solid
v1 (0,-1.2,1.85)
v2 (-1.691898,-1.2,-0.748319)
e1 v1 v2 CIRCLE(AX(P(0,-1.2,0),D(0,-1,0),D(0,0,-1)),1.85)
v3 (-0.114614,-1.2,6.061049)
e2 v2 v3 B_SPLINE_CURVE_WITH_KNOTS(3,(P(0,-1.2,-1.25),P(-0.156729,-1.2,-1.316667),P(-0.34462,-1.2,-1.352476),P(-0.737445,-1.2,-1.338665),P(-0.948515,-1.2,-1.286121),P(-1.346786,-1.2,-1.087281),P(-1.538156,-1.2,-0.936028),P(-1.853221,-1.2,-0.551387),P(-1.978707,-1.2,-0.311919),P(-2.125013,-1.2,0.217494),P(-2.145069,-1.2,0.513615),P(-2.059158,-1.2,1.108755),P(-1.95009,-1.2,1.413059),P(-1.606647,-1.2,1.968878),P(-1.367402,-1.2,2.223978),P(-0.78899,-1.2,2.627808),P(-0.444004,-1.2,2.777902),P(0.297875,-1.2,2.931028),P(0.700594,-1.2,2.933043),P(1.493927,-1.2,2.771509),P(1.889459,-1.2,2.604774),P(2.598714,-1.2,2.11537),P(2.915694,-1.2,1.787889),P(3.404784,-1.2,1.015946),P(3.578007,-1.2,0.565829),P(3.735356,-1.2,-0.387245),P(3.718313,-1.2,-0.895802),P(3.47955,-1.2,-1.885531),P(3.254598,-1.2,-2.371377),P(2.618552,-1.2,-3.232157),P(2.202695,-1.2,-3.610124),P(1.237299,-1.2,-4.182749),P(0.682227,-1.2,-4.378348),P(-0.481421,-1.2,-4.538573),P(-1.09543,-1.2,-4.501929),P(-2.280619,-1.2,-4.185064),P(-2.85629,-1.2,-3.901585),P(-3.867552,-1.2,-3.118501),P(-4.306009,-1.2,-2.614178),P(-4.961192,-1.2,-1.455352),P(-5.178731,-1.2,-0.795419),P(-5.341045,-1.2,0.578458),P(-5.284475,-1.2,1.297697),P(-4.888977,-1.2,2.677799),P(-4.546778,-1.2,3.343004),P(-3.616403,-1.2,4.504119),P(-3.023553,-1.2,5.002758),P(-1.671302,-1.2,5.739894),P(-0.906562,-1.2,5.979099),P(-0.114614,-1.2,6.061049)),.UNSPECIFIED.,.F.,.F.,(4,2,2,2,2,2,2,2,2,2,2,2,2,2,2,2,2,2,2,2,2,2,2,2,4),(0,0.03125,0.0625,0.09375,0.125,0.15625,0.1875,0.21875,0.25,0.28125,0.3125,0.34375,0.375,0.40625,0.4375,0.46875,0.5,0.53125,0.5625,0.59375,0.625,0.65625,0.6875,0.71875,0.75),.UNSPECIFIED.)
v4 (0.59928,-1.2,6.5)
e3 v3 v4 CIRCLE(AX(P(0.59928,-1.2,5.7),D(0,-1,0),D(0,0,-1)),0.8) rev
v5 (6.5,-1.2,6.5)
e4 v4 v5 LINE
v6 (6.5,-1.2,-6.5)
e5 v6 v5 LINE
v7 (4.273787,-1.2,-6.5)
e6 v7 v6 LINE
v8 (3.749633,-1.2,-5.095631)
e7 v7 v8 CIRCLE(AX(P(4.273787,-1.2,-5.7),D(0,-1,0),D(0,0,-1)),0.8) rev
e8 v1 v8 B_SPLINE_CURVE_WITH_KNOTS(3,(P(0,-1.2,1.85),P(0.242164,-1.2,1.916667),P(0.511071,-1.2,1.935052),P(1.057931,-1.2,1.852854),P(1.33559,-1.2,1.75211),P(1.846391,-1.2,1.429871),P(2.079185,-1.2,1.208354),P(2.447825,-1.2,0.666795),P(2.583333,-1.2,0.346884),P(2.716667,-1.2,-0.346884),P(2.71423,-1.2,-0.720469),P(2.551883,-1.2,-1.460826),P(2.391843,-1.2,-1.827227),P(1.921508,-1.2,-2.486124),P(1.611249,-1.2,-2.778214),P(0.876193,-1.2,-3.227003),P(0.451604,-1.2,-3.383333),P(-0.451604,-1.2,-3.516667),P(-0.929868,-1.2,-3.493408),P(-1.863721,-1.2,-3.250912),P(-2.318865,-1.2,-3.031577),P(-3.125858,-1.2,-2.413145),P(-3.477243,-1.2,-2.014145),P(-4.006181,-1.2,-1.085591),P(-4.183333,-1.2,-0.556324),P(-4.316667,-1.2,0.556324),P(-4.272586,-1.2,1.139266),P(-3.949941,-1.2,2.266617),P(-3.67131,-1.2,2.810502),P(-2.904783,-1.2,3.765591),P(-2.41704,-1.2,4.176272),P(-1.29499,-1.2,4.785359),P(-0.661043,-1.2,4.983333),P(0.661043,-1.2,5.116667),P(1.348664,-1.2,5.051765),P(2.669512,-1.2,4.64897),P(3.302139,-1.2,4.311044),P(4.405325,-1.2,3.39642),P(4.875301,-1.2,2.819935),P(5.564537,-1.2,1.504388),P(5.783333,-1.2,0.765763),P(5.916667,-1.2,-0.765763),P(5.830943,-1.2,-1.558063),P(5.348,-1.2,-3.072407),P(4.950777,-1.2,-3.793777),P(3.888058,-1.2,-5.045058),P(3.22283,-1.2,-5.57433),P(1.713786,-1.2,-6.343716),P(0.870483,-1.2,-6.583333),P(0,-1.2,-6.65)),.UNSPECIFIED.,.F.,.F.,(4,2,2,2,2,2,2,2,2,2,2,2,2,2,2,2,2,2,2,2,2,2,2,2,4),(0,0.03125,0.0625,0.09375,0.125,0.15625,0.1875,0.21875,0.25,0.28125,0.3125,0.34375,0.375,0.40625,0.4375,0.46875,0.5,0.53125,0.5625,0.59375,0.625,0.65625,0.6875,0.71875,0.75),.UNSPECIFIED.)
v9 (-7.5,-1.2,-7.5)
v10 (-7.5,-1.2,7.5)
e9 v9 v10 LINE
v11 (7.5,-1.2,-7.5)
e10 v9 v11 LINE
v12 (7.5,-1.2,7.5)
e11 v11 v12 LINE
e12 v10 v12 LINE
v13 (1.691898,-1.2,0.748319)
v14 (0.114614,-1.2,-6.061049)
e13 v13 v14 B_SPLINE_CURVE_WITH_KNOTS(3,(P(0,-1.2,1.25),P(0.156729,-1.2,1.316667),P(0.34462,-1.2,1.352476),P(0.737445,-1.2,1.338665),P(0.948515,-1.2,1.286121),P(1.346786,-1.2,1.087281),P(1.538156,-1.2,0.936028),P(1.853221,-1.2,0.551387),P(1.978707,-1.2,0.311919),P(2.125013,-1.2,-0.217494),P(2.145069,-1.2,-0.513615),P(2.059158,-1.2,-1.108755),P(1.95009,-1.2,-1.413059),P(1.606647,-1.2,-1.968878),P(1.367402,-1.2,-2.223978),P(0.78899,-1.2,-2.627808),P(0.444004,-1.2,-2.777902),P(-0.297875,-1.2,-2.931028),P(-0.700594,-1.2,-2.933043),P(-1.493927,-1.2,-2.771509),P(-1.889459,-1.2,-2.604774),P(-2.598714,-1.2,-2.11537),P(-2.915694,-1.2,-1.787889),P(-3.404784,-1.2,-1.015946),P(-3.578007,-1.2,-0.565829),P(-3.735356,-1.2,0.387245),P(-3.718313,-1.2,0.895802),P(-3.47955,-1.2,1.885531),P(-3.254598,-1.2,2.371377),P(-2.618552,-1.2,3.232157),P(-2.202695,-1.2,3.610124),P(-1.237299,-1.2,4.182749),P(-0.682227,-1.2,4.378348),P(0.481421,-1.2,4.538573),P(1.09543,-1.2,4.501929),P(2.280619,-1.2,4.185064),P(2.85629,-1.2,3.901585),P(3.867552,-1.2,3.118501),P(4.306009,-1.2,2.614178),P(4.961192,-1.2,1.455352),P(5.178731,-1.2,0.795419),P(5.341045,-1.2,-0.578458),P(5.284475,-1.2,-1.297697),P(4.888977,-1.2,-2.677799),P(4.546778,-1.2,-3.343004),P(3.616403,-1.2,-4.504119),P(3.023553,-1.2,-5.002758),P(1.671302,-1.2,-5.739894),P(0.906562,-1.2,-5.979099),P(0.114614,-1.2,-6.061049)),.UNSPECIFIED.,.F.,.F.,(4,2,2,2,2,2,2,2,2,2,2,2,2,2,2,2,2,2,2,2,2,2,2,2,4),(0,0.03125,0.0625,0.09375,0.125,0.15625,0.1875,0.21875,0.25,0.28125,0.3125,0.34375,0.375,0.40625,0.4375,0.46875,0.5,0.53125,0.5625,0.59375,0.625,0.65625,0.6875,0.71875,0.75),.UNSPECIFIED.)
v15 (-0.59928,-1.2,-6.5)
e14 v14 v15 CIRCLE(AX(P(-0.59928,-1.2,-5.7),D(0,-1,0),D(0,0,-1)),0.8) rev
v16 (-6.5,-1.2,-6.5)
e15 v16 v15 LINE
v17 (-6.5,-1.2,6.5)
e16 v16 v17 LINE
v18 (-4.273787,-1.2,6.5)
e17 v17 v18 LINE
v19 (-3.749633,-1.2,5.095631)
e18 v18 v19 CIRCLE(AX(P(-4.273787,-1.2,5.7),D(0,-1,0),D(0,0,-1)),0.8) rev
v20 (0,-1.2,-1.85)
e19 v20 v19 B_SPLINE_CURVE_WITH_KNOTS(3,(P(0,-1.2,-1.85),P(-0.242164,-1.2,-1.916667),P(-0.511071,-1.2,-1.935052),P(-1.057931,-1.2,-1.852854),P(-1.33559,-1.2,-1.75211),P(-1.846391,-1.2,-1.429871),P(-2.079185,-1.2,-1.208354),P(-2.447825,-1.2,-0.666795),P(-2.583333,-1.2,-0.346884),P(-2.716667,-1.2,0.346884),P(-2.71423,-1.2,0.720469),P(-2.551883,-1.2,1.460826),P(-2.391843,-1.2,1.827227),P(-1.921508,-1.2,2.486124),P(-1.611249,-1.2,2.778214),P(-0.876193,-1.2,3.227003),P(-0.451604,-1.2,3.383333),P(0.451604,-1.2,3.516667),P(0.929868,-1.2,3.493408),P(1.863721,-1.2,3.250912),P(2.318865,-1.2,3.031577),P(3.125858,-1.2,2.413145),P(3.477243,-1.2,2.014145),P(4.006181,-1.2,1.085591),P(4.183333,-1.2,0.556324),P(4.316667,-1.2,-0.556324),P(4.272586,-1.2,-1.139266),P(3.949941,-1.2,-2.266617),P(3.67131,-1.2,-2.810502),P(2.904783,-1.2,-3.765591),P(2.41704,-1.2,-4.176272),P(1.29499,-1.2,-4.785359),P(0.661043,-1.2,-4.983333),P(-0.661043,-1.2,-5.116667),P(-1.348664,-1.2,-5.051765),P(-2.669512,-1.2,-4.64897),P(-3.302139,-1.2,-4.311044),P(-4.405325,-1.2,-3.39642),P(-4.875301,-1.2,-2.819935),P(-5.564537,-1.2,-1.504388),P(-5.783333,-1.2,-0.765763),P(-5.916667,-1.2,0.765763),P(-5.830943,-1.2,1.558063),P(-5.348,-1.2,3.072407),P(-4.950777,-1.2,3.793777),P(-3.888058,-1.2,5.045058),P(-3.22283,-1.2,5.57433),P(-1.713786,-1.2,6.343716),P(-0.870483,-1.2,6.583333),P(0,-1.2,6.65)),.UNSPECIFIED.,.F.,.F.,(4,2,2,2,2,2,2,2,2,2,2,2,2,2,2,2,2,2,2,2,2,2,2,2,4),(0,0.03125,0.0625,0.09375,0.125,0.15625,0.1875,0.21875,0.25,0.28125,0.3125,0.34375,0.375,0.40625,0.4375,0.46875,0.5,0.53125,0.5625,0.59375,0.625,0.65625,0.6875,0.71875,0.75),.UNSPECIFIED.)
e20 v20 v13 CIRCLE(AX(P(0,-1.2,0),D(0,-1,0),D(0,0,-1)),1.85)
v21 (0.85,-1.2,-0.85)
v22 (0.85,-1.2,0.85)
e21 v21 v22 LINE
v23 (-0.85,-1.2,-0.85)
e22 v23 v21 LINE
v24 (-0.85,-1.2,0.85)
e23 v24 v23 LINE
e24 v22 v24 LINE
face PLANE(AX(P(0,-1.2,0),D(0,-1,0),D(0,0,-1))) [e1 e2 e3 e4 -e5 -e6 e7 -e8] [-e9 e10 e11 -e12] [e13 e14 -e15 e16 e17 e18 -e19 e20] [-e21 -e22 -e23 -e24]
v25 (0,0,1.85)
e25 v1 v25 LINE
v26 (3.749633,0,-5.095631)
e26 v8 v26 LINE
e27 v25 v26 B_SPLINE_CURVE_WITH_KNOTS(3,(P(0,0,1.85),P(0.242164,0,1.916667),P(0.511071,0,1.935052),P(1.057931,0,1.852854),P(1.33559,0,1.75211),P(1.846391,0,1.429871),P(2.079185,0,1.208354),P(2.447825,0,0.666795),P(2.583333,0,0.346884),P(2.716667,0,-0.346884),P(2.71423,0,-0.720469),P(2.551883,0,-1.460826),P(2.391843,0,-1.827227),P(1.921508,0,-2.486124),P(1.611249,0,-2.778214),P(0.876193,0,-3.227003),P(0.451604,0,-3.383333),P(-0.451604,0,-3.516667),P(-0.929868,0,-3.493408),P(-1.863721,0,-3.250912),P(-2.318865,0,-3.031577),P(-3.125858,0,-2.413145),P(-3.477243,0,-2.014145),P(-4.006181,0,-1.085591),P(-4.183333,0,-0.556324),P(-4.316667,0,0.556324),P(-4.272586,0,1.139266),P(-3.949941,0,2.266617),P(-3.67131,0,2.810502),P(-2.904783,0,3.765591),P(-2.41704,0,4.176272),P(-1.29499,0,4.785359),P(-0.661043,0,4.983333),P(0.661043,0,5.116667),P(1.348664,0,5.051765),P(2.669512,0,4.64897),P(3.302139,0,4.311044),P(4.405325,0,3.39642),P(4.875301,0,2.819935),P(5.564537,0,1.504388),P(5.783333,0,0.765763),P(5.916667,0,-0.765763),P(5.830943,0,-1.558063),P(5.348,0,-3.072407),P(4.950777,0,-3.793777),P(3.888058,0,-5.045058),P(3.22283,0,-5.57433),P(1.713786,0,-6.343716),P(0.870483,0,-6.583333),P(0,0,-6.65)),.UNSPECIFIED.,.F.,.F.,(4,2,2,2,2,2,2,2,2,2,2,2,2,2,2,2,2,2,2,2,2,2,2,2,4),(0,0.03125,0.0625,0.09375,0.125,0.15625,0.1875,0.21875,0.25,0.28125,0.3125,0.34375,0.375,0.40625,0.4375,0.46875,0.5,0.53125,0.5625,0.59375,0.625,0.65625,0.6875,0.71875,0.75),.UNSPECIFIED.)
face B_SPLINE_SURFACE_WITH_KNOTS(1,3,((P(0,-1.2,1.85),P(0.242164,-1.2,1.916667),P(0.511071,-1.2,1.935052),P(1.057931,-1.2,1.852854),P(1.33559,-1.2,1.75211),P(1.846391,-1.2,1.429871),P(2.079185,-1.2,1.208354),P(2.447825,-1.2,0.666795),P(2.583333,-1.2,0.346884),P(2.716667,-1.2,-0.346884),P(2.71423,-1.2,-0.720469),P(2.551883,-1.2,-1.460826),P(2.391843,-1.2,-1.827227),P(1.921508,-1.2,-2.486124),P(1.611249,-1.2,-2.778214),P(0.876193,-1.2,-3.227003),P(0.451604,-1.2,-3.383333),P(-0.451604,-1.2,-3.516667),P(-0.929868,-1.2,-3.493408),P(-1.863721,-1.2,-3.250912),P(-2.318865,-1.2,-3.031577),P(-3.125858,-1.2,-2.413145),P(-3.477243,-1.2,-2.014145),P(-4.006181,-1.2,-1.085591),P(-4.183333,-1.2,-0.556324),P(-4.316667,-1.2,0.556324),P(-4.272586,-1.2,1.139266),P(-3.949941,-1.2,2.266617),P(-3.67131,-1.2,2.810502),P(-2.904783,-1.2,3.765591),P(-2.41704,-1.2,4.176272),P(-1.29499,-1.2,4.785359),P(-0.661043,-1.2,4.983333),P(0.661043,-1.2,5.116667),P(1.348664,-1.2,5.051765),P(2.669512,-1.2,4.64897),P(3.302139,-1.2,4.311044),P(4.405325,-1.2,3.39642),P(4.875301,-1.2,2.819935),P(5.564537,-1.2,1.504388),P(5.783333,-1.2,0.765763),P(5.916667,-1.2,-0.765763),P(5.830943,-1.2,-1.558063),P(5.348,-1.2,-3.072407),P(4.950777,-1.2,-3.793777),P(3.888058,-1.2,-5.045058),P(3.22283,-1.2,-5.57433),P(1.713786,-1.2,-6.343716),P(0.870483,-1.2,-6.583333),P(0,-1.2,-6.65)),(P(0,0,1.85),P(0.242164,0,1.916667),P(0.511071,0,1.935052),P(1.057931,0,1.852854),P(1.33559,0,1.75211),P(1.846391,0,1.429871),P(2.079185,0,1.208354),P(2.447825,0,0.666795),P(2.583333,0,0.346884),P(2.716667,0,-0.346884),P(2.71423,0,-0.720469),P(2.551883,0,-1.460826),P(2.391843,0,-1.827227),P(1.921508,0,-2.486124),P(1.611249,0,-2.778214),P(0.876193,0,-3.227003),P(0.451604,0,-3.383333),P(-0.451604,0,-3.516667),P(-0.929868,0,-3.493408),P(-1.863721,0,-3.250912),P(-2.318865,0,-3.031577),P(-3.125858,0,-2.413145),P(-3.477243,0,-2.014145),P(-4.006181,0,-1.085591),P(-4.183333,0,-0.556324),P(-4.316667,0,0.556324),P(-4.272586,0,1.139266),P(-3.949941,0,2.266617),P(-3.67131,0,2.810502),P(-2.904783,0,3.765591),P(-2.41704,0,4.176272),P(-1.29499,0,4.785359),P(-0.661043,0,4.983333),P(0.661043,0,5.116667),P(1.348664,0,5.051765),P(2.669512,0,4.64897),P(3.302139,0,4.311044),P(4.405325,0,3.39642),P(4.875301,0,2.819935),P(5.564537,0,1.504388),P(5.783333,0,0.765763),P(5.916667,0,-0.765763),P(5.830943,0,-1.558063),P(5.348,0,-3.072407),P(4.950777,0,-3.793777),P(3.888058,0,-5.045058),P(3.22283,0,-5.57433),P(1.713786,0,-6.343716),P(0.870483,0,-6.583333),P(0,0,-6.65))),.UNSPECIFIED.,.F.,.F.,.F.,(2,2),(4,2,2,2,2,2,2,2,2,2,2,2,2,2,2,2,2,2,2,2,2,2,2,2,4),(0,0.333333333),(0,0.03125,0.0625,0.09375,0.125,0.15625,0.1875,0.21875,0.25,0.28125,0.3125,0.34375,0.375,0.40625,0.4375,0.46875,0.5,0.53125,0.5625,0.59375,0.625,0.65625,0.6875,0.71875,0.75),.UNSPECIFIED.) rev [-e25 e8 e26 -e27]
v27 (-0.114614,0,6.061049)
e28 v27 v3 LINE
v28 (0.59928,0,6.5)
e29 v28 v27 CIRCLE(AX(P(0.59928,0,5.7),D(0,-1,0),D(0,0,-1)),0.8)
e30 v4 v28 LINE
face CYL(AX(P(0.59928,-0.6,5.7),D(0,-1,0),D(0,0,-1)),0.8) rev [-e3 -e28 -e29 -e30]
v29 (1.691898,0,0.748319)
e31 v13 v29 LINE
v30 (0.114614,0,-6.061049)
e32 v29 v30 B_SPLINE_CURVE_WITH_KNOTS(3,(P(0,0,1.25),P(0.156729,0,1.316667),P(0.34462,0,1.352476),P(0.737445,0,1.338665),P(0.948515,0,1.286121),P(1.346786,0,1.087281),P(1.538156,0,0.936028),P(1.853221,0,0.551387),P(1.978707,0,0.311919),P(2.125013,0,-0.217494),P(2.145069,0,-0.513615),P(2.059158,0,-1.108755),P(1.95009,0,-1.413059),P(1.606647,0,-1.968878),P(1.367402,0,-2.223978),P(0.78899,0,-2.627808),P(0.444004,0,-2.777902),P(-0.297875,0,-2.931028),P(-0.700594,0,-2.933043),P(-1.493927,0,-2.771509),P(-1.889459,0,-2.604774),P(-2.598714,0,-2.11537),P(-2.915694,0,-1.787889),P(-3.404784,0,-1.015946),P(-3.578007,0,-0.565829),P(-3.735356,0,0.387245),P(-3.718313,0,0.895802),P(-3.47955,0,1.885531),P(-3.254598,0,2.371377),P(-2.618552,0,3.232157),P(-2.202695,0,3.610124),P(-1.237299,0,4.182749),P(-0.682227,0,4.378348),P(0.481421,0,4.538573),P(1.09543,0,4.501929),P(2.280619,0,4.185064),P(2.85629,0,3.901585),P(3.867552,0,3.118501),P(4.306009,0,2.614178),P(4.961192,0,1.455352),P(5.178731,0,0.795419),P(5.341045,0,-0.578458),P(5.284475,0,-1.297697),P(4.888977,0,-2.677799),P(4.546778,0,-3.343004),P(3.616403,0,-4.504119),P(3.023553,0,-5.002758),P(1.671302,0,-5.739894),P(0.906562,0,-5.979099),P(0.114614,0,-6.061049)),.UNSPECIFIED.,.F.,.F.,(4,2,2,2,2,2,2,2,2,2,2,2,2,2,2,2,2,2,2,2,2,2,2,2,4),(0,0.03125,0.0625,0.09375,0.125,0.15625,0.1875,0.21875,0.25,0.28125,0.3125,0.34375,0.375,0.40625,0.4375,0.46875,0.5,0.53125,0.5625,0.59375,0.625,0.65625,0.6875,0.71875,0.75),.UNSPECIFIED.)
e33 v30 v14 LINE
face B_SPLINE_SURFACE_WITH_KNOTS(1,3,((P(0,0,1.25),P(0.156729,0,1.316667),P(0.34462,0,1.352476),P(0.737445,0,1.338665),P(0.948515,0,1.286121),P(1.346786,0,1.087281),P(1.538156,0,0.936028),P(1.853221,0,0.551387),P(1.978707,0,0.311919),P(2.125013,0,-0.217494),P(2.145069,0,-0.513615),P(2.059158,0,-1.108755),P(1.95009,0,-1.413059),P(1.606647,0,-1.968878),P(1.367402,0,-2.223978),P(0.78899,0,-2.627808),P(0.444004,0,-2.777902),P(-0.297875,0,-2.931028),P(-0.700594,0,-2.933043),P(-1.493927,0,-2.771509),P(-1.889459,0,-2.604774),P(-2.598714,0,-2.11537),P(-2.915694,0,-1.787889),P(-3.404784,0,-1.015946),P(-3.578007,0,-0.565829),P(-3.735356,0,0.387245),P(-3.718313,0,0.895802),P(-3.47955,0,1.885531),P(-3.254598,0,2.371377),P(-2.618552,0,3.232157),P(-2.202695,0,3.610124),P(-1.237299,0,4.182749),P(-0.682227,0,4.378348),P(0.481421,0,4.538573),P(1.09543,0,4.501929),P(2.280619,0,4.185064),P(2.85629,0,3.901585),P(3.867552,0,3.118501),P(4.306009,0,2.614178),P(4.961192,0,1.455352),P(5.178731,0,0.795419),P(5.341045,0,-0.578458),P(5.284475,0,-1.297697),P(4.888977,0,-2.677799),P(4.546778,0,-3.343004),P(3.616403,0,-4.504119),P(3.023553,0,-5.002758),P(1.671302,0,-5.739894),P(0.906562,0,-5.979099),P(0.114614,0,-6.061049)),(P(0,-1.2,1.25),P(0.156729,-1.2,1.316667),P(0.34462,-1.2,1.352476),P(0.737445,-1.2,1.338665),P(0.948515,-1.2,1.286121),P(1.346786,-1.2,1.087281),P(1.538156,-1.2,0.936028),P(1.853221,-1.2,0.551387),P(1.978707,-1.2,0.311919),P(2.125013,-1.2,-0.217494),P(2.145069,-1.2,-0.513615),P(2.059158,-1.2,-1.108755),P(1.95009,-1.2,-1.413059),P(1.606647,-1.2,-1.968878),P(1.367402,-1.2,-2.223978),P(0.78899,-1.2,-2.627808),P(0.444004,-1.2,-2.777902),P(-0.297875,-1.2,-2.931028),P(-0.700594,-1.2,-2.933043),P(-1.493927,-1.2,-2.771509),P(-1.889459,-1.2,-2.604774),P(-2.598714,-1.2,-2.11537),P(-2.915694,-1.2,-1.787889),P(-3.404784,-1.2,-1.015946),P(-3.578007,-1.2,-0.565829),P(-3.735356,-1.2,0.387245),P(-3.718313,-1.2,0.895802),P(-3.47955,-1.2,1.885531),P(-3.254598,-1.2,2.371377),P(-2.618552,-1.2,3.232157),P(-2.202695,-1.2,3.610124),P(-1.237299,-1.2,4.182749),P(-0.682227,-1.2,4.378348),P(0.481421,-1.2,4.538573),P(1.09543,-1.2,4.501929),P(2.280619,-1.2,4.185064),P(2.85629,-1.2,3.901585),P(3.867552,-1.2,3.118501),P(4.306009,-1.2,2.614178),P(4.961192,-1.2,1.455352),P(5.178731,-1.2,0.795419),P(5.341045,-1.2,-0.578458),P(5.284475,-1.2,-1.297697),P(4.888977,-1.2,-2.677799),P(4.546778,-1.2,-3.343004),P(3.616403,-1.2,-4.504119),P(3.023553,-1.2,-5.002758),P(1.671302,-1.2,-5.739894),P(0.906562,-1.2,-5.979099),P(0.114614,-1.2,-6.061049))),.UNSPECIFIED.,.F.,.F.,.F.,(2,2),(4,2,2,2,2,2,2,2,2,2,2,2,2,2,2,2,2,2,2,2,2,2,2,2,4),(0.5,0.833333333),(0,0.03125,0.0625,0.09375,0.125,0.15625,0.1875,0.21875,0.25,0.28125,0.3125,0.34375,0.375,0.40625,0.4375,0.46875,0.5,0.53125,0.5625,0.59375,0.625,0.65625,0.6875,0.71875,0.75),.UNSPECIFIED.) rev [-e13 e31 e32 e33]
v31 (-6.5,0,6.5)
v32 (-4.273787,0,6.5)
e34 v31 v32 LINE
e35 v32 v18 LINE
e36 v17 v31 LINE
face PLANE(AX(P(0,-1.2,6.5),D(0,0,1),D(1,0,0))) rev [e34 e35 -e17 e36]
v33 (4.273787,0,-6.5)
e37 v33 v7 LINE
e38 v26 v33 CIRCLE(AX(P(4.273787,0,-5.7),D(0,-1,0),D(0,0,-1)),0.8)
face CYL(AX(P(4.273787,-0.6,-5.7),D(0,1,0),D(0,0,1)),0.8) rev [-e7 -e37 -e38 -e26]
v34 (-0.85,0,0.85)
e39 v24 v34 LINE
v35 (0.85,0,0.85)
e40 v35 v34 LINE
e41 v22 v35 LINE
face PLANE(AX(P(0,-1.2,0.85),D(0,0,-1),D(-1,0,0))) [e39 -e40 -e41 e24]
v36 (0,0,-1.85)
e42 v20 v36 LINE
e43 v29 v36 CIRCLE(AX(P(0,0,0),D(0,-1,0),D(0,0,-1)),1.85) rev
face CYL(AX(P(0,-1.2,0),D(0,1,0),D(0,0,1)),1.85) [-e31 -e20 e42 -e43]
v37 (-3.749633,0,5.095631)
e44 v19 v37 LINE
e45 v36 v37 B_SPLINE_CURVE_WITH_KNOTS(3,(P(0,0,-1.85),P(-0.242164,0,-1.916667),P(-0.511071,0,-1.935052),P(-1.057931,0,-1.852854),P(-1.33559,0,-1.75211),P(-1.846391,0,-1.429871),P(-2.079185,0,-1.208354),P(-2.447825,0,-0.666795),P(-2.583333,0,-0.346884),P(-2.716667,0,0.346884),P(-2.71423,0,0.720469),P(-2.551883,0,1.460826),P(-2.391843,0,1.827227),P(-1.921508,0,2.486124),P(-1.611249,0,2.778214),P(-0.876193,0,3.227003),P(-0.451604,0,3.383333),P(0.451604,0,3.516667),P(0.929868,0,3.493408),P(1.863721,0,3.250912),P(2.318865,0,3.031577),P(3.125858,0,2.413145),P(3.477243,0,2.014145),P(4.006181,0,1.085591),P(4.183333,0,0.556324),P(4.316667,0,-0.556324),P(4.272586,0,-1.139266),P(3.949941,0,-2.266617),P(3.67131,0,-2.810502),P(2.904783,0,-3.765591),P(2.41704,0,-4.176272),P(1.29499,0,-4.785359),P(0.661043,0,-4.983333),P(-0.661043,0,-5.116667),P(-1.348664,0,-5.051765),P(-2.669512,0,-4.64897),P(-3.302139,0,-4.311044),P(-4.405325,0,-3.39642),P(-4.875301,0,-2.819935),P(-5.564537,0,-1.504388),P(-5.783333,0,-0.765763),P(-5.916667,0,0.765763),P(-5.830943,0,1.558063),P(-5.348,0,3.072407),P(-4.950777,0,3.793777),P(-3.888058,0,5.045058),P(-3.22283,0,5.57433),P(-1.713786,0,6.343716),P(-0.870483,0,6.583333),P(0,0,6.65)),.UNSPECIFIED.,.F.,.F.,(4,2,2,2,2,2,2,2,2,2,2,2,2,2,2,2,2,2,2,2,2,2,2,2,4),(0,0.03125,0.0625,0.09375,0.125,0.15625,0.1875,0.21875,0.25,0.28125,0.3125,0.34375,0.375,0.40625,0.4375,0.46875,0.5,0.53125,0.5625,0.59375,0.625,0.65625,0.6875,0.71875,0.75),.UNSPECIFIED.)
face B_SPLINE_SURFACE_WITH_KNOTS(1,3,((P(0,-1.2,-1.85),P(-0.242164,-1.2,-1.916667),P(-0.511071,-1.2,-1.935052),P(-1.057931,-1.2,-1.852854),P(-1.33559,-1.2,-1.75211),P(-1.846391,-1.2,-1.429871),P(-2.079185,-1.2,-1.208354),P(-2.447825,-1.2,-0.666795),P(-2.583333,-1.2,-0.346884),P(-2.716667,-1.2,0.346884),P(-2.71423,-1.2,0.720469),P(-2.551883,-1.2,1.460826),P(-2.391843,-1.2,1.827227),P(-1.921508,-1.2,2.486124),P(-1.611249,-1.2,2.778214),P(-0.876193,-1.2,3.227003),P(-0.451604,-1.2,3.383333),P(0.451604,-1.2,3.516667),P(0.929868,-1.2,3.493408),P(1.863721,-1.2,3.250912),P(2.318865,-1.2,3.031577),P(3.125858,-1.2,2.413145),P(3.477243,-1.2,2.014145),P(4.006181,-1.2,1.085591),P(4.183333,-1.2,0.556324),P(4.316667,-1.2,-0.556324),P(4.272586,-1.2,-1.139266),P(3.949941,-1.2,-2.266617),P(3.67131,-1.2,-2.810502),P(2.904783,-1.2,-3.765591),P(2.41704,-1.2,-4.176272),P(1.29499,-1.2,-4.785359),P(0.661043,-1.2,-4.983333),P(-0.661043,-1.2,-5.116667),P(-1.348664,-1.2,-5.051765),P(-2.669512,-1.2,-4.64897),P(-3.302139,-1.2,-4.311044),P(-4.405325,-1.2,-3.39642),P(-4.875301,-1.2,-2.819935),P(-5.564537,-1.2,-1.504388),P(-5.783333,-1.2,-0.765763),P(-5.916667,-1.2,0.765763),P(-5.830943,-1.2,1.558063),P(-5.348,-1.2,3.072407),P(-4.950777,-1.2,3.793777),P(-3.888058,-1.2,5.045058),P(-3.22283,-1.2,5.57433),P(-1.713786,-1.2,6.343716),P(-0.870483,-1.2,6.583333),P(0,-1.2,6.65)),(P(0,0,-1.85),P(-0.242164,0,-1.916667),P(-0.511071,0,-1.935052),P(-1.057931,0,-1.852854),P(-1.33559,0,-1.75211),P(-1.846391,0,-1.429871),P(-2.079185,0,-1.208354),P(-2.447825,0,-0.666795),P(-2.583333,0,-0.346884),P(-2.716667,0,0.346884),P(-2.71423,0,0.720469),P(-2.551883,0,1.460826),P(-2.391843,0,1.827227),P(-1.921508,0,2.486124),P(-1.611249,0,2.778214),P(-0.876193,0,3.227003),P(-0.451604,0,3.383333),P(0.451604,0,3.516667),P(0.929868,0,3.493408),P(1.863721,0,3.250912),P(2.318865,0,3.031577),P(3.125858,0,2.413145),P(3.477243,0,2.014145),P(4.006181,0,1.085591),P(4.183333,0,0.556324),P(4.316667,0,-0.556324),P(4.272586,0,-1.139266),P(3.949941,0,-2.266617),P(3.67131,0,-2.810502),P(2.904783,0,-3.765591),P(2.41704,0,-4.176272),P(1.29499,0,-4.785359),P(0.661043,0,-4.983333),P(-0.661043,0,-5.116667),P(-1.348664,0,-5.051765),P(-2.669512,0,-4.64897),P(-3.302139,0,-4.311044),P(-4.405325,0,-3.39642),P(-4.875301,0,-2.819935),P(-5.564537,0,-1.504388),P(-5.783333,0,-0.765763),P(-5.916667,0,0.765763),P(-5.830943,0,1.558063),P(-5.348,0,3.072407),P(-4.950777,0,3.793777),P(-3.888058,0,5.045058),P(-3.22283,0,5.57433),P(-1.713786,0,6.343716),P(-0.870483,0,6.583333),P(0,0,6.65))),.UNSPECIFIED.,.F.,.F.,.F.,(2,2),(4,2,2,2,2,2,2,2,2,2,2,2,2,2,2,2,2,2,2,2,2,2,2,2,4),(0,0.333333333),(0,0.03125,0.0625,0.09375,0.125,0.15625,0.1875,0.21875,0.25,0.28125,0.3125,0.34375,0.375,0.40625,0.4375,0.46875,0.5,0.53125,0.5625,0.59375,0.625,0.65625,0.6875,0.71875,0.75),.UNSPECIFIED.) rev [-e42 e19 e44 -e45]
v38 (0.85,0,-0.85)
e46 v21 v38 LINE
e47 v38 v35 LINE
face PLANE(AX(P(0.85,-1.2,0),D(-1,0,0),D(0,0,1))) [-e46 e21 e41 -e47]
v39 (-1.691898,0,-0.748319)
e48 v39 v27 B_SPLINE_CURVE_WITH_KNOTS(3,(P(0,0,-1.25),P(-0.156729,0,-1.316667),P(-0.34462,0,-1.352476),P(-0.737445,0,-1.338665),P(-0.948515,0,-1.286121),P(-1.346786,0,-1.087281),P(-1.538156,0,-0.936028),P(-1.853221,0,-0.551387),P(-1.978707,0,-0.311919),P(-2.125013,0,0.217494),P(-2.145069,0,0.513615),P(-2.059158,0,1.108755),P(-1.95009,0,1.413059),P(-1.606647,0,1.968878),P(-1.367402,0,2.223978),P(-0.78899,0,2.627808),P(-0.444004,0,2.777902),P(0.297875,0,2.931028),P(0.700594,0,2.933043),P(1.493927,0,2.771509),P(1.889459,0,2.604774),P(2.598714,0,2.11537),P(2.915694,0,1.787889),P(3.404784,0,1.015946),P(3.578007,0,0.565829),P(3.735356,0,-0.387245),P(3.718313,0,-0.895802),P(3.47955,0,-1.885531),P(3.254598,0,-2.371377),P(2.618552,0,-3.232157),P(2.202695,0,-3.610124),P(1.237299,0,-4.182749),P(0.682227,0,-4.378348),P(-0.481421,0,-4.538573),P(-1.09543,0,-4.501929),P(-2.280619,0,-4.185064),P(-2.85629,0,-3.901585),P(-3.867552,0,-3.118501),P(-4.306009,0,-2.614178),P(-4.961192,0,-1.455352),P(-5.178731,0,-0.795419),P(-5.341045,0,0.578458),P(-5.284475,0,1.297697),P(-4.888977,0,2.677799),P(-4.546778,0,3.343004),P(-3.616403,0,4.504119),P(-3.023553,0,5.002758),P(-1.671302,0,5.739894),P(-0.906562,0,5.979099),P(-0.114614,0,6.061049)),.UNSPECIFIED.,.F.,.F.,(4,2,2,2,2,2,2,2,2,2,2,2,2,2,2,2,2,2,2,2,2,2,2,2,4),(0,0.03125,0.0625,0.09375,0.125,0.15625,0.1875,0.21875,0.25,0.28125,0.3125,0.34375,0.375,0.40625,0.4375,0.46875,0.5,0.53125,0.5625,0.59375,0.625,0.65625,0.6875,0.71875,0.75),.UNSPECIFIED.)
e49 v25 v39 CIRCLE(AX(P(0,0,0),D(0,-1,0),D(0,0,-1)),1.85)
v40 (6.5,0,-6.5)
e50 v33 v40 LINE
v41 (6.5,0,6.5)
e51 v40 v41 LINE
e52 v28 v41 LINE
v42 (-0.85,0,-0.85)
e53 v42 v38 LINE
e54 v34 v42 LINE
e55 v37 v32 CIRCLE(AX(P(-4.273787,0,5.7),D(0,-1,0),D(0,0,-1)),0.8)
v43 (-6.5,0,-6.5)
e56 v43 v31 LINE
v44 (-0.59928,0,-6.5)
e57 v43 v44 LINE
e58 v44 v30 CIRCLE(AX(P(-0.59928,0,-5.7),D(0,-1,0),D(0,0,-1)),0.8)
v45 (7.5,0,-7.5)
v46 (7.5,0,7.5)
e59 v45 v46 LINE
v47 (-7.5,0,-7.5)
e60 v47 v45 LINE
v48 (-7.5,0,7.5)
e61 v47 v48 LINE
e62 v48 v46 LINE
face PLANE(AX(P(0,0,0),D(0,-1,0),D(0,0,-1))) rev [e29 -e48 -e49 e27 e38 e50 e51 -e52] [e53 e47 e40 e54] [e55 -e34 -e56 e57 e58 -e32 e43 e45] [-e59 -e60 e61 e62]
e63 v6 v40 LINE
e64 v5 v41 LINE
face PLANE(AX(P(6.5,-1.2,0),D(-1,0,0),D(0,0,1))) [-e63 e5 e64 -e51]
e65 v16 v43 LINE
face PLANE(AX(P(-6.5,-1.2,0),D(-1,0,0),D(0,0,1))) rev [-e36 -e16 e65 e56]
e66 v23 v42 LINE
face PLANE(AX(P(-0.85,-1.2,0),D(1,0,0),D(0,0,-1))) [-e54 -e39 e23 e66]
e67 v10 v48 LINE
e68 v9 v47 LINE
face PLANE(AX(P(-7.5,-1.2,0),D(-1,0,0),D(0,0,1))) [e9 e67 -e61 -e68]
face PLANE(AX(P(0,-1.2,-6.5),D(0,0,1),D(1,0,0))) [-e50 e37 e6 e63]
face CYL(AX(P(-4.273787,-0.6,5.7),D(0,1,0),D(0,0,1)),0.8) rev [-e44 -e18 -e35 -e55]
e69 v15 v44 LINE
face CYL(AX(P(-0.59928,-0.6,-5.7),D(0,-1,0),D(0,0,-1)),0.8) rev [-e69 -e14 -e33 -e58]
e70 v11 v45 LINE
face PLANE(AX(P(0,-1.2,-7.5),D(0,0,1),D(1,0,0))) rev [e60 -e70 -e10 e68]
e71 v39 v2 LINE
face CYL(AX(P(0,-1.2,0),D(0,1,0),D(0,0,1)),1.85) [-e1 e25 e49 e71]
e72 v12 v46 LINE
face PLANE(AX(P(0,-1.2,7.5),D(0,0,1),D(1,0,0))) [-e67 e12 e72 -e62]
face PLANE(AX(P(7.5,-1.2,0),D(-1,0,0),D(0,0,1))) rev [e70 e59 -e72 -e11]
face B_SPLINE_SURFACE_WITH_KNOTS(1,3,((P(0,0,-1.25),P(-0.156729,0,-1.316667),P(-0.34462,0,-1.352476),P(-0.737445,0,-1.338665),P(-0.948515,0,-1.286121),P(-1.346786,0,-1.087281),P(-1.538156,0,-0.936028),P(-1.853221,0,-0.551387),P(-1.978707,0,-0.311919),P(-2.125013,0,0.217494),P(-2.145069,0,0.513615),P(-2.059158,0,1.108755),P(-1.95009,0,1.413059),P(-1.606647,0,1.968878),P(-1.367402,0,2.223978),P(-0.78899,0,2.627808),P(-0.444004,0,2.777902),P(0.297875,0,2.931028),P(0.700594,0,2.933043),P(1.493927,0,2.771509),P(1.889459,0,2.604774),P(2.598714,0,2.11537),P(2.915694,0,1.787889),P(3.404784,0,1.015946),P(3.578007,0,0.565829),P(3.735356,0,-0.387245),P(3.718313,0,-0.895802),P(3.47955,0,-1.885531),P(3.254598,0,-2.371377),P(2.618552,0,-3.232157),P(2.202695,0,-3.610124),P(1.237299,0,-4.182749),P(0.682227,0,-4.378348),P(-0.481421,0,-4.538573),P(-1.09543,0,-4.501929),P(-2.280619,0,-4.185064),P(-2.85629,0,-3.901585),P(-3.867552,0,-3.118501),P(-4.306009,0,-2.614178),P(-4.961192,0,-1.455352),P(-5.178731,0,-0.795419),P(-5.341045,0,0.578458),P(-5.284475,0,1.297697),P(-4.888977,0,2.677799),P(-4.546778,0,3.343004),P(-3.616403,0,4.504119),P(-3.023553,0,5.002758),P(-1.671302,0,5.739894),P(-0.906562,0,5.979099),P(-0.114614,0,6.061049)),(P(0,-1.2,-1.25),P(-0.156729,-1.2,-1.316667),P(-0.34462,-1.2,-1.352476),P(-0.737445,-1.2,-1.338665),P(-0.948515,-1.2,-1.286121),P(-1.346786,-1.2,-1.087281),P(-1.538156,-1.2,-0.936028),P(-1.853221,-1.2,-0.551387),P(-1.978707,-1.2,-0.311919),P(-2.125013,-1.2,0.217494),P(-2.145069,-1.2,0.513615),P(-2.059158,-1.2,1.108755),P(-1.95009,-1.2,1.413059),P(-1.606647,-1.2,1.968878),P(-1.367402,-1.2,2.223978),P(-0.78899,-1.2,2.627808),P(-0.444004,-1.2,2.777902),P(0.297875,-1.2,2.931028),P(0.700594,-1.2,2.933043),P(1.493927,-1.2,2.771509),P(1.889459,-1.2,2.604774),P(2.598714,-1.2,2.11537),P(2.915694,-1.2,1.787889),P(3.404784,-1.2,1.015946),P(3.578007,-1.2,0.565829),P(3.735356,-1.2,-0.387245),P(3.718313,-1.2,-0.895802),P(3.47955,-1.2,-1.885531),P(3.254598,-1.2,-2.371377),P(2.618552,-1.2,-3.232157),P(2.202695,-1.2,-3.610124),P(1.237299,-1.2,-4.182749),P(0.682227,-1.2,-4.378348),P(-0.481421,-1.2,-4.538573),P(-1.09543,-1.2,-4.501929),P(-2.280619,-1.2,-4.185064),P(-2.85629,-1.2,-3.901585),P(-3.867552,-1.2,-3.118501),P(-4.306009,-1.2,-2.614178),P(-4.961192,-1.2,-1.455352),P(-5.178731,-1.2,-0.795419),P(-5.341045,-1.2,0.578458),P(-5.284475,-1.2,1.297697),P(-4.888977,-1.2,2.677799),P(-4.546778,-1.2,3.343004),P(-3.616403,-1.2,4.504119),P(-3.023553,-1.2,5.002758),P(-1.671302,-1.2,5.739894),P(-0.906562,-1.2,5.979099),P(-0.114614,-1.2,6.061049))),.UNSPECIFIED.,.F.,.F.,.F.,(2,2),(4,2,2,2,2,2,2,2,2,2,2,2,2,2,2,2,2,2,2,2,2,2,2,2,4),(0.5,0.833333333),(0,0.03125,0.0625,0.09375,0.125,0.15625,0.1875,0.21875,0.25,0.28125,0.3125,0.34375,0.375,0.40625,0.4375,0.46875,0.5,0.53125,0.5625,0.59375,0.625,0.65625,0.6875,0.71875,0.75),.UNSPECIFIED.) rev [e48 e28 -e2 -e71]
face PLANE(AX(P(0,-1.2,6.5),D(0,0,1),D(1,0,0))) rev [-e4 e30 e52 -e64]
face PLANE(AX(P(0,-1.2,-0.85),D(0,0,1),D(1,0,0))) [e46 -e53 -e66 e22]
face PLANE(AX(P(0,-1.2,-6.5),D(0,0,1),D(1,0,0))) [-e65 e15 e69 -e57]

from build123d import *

# Parameters (mm, degrees)
SKETCH1_W           = 1.5
SKETCH1_H           = 5
BOSS_EXTRUDE1_DEPTH = 8
SKETCH2_W           = 1.5
SKETCH2_H           = 1.5
BOSS_EXTRUDE2_DEPTH = 8
SKETCH3_W           = 15
SKETCH3_H           = 15
SKETCH3_W_2         = 13
SKETCH3_H_2         = 13
SKETCH3_R           = 1.85
SKETCH3_W_3         = 1.7
SKETCH3_H_3         = 1.7
BOSS_EXTRUDE3_DEPTH = 1.2
SWEEP1_START        = -1.2
SWEEP1_DEPTH        = 1.2
CIRPATTERN2_COUNT   = 2
FILLET3_R           = 0.8
CUT_EXTRUDE1_DEPTH  = 1.6


# Read off the part's stored shape, not the designer's step: Sweep1
with BuildPart() as part:
    # Sketch1 → Boss-Extrude1 (new body)
    with BuildSketch(Plane(origin=(0, 0, 0), x_dir=(1, 0, 0), z_dir=(0, 1, 0))):
        Rectangle(SKETCH1_W, SKETCH1_H)
    extrude(amount=BOSS_EXTRUDE1_DEPTH)

    # Sketch2 → Boss-Extrude2 (add)
    with BuildSketch(Plane.XZ):
        Rectangle(SKETCH2_W, SKETCH2_H)
    extrude(amount=BOSS_EXTRUDE2_DEPTH)

    # Sketch3 → Boss-Extrude3 (add)
    # profile 1 of 2: a face of its own
    with BuildSketch(Plane.XZ):
        Rectangle(SKETCH3_W, SKETCH3_H)
        Rectangle(SKETCH3_W_2, SKETCH3_H_2, mode=Mode.SUBTRACT)
    # profile 2 of 2: a face of its own
    with BuildSketch(Plane.XZ):
        with Locations(Location((0, 0, 0), (0, 0, 66.083465578))):
            Circle(SKETCH3_R)
        Rectangle(SKETCH3_W_3, SKETCH3_H_3, mode=Mode.SUBTRACT)
    extrude(amount=BOSS_EXTRUDE3_DEPTH)


with BuildPart() as boss_extrude3_piece_1:
    # of the separate pieces the step leaves, piece 1, a body of its own (boss_extrude3_pieces)
    add(part.part.solids().sort_by_distance((0.75, 0, -2.5))[0])



with BuildPart() as boss_extrude3_piece_2:
    # of the separate pieces the step leaves, piece 2, a body of its own (boss_extrude3_pieces)
    add(part.part.solids().sort_by_distance((-7.5, 0, -7.5))[0])


with BuildPart() as boss_extrude3_piece_1_1:
    add(boss_extrude3_piece_1.part)

    add(boss_extrude3_piece_2.part)  # Sweep1 merges Boss-Extrude3 piece 2
    # Sweep1 outline → Sweep1 (add)
    with BuildSketch(Plane(origin=(0, 0, 0), x_dir=(1, 0, 0), z_dir=(0, 1, 0)).offset(SWEEP1_START)):
        with BuildLine():
            add(Edge.make_bspline(
                [(-1.691897861, 0.748319202), (-1.693163504, 0.746784611), (-1.694426991, 0.745247382), (-1.853220531, 0.551386567), (-1.978707364, 0.311918606), (-2.125013397, -0.217494132), (-2.145069321, -0.513615483), (-2.059157744, -1.108754729), (-1.950089737, -1.413058858), (-1.606646572, -1.968877639), (-1.367401578, -2.223977533), (-0.788989663, -2.62780751), (-0.444003714, -2.777902199), (0.297874854, -2.931028384), (0.700594437, -2.933043256), (1.493927257, -2.771508946), (1.889458602, -2.604773973), (2.59871441, -2.115370005), (2.915694268, -1.78788872), (3.404784293, -1.015946068), (3.578007202, -0.56582859), (3.73535564, 0.387244565), (3.718312626, 0.895802339), (3.479550265, 1.885530976), (3.254598183, 2.371376752), (2.618552361, 3.232156899), (2.202694656, 3.610123988), (1.237298759, 4.182748957), (0.682226939, 4.378347606), (-0.481420519, 4.53857303), (-1.095429987, 4.501928996), (-2.28061863, 4.185064327), (-2.856289797, 3.901585226), (-3.8675524, 3.118500834), (-4.306008503, 2.614177546), (-4.961192023, 1.455351845), (-5.178731191, 0.795418867), (-5.341045064, -0.578458244), (-5.284475034, -1.297697465), (-4.888977162, -2.677799118), (-4.546778497, -3.343003776), (-3.616402637, -4.504119251), (-3.023553469, -5.002758099), (-1.671302056, -5.739893579), (-0.906562014, -5.979098718), (-0.114613579, -6.06104862)],
                knots=[0.09349979, 0.09349979, 0.09349979, 0.09349979, 0.09375, 0.09375, 0.125, 0.125, 0.15625, 0.15625, 0.1875, 0.1875, 0.21875, 0.21875, 0.25, 0.25, 0.28125, 0.28125, 0.3125, 0.3125, 0.34375, 0.34375, 0.375, 0.375, 0.40625, 0.40625, 0.4375, 0.4375, 0.46875, 0.46875, 0.5, 0.5, 0.53125, 0.53125, 0.5625, 0.5625, 0.59375, 0.59375, 0.625, 0.625, 0.65625, 0.65625, 0.6875, 0.6875, 0.71875, 0.71875, 0.75, 0.75, 0.75, 0.75], degree=3))
            ThreePointArc((-1.691897861, 0.748319202), (-1.009482411, 1.550304893), (0, 1.85))
            add(Edge.make_bspline(
                [(0, 1.85), (-0.24216446, 1.91666668), (-0.511071124, 1.935052118), (-1.057930949, 1.852853965), (-1.335589871, 1.752109953), (-1.846390644, 1.429870563), (-2.079184863, 1.2083542), (-2.447824847, 0.666794619), (-2.583333461, 0.346884052), (-2.716666539, -0.346884052), (-2.714230217, -0.720469413), (-2.551883118, -1.460826151), (-2.391843399, -1.827227219), (-1.921507966, -2.486124147), (-1.611249372, -2.778213942), (-0.876192939, -3.22700302), (-0.451603808, -3.383333431), (0.451603808, -3.516666569), (0.92986771, -3.493408335), (1.863721346, -3.250912253), (2.318864578, -3.031576858), (3.125857637, -2.413145358), (3.477243033, -2.014144549), (4.00618118, -1.085591254), (4.183333413, -0.556323564), (4.316666587, 0.556323564), (4.272586461, 1.13926601), (3.949941379, 2.266616538), (3.671310321, 2.810501943), (2.904782744, 3.765591122), (2.417039728, 4.176272131), (1.294989566, 4.785359335), (0.66104332, 4.9833334), (-0.66104332, 5.1166666), (-1.348664313, 5.051764592), (-2.669511727, 4.6489705), (-3.302139311, 4.311043788), (-4.405324604, 3.396420127), (-4.875301232, 2.819934909), (-5.564537485, 1.504387877), (-5.783333391, 0.765763075), (-5.916666609, -0.765763075), (-5.830942725, -1.558062617), (-5.347999618, -3.072406915), (-4.950777256, -3.793776681), (-3.888057509, -5.045058084), (-3.222830091, -5.574330336), (-2.001290759, -6.197131568), (-1.500260426, -6.379660655), (-0.979824705, -6.500000001)],
                knots=[0, 0, 0, 0, 0.03125, 0.03125, 0.0625, 0.0625, 0.09375, 0.09375, 0.125, 0.125, 0.15625, 0.15625, 0.1875, 0.1875, 0.21875, 0.21875, 0.25, 0.25, 0.28125, 0.28125, 0.3125, 0.3125, 0.34375, 0.34375, 0.375, 0.375, 0.40625, 0.40625, 0.4375, 0.4375, 0.46875, 0.46875, 0.5, 0.5, 0.53125, 0.53125, 0.5625, 0.5625, 0.59375, 0.59375, 0.625, 0.625, 0.65625, 0.65625, 0.6875, 0.6875, 0.71875, 0.71875, 0.738092437, 0.738092437, 0.738092437, 0.738092437], degree=3))
            Line((-0.979824705, -6.500000001), (-0.029190927, -6.5))
            Line((-0.029190927, -6.5), (-0.114613579, -6.06104862))
        make_face()
    sweep1 = extrude(amount=SWEEP1_DEPTH)

    # CirPattern2: Sweep1 ×2 about axis
    cirpattern2_axis = Axis((0, 8, 0), (0, 1, 0))
    for i in range(1, CIRPATTERN2_COUNT):
        add(sweep1.rotate(cirpattern2_axis, i * 360 / CIRPATTERN2_COUNT))

    # Fillet3
    # the kernel refuses this fillet: 0.8 mm, written as the material it adds along each edge
    with BuildSketch(Plane(origin=(0.029190927, -1.2, -6.5), x_dir=(-1, 0, 0), z_dir=(0, 1, 0)), Plane(origin=(-0.029190927, -1.2, 6.5), x_dir=(1, 0, 0), z_dir=(0, 1, 0))) as fillet3_piece_1:
        with BuildLine():
            CenterArc((0.628470823, 0.8), FILLET3_R, 206.827813059, 63.172186941)
            Line((-0.085422652, 0.43895138), (-0.099700522, 0.431730408))
            ThreePointArc((-0.099700522, 0.431730408), (-0.058416696, 0.216419328), (-0.01570537, -0.003056362))
            Line((-0.01570537, -0.003056362), (0, -0.016))
            Line((0, -0.016), (0.628470823, -0.016))
            Line((0.628470823, -0.016), (0.628470823, 0))
        make_face()
    fillet3_piece_1_solid = extrude(amount=1.2, mode=Mode.PRIVATE)
    with BuildSketch(Plane(origin=(-0.979824705, -1.2, 6.500000001), x_dir=(-0.8919059375124657, 0, -0.45222096217447677), z_dir=(0, 1, 0)), Plane(origin=(0.979824705, -1.2, -6.500000001), x_dir=(0.8919059375124657, 0, 0.45222096217447677), z_dir=(0, 1, 0))) as fillet3_piece_2:
        with BuildLine():
            CenterArc((3.299681481, 0.77607414), FILLET3_R, 116.886268111, 139.06572266)
            Line((2.937904711, 1.48959889), (2.930669176, 1.503869385))
            Line((2.930669176, 1.503869385), (-0.007235535, 0.014270495))
            Line((-0.007235535, 0.014270495), (0.00383462, -0.015533695))
            ThreePointArc((0.00383462, -0.015533695), (1.552597942, 0.17463645), (3.101609852, -0.015521483))
            Line((3.101609852, -0.015521483), (3.105493609, 0))
        make_face()
    fillet3_piece_2_solid = extrude(amount=1.2, mode=Mode.PRIVATE)
    add([fillet3_piece_1_solid, fillet3_piece_2_solid])

    # Sketch10 → Cut-Extrude1 (cut)
    with BuildSketch(Plane(origin=(0.75, 0, 0), x_dir=(0, 0, -1), z_dir=(1, 0, 0))):
        Polygon((0.85, 0), (1.691153453, 0), (2.5, 0), (2.5, 8), (-2.5, 8), (-2.5, 0), (-1.898827408, 0), (-0.85, 0), (-0.75, 0), (-0.75, -8), (0.75, -8), (0.75, 0), align=None)
    extrude(amount=-CUT_EXTRUDE1_DEPTH, mode=Mode.SUBTRACT)


solid = boss_extrude3_piece_1_1.part
